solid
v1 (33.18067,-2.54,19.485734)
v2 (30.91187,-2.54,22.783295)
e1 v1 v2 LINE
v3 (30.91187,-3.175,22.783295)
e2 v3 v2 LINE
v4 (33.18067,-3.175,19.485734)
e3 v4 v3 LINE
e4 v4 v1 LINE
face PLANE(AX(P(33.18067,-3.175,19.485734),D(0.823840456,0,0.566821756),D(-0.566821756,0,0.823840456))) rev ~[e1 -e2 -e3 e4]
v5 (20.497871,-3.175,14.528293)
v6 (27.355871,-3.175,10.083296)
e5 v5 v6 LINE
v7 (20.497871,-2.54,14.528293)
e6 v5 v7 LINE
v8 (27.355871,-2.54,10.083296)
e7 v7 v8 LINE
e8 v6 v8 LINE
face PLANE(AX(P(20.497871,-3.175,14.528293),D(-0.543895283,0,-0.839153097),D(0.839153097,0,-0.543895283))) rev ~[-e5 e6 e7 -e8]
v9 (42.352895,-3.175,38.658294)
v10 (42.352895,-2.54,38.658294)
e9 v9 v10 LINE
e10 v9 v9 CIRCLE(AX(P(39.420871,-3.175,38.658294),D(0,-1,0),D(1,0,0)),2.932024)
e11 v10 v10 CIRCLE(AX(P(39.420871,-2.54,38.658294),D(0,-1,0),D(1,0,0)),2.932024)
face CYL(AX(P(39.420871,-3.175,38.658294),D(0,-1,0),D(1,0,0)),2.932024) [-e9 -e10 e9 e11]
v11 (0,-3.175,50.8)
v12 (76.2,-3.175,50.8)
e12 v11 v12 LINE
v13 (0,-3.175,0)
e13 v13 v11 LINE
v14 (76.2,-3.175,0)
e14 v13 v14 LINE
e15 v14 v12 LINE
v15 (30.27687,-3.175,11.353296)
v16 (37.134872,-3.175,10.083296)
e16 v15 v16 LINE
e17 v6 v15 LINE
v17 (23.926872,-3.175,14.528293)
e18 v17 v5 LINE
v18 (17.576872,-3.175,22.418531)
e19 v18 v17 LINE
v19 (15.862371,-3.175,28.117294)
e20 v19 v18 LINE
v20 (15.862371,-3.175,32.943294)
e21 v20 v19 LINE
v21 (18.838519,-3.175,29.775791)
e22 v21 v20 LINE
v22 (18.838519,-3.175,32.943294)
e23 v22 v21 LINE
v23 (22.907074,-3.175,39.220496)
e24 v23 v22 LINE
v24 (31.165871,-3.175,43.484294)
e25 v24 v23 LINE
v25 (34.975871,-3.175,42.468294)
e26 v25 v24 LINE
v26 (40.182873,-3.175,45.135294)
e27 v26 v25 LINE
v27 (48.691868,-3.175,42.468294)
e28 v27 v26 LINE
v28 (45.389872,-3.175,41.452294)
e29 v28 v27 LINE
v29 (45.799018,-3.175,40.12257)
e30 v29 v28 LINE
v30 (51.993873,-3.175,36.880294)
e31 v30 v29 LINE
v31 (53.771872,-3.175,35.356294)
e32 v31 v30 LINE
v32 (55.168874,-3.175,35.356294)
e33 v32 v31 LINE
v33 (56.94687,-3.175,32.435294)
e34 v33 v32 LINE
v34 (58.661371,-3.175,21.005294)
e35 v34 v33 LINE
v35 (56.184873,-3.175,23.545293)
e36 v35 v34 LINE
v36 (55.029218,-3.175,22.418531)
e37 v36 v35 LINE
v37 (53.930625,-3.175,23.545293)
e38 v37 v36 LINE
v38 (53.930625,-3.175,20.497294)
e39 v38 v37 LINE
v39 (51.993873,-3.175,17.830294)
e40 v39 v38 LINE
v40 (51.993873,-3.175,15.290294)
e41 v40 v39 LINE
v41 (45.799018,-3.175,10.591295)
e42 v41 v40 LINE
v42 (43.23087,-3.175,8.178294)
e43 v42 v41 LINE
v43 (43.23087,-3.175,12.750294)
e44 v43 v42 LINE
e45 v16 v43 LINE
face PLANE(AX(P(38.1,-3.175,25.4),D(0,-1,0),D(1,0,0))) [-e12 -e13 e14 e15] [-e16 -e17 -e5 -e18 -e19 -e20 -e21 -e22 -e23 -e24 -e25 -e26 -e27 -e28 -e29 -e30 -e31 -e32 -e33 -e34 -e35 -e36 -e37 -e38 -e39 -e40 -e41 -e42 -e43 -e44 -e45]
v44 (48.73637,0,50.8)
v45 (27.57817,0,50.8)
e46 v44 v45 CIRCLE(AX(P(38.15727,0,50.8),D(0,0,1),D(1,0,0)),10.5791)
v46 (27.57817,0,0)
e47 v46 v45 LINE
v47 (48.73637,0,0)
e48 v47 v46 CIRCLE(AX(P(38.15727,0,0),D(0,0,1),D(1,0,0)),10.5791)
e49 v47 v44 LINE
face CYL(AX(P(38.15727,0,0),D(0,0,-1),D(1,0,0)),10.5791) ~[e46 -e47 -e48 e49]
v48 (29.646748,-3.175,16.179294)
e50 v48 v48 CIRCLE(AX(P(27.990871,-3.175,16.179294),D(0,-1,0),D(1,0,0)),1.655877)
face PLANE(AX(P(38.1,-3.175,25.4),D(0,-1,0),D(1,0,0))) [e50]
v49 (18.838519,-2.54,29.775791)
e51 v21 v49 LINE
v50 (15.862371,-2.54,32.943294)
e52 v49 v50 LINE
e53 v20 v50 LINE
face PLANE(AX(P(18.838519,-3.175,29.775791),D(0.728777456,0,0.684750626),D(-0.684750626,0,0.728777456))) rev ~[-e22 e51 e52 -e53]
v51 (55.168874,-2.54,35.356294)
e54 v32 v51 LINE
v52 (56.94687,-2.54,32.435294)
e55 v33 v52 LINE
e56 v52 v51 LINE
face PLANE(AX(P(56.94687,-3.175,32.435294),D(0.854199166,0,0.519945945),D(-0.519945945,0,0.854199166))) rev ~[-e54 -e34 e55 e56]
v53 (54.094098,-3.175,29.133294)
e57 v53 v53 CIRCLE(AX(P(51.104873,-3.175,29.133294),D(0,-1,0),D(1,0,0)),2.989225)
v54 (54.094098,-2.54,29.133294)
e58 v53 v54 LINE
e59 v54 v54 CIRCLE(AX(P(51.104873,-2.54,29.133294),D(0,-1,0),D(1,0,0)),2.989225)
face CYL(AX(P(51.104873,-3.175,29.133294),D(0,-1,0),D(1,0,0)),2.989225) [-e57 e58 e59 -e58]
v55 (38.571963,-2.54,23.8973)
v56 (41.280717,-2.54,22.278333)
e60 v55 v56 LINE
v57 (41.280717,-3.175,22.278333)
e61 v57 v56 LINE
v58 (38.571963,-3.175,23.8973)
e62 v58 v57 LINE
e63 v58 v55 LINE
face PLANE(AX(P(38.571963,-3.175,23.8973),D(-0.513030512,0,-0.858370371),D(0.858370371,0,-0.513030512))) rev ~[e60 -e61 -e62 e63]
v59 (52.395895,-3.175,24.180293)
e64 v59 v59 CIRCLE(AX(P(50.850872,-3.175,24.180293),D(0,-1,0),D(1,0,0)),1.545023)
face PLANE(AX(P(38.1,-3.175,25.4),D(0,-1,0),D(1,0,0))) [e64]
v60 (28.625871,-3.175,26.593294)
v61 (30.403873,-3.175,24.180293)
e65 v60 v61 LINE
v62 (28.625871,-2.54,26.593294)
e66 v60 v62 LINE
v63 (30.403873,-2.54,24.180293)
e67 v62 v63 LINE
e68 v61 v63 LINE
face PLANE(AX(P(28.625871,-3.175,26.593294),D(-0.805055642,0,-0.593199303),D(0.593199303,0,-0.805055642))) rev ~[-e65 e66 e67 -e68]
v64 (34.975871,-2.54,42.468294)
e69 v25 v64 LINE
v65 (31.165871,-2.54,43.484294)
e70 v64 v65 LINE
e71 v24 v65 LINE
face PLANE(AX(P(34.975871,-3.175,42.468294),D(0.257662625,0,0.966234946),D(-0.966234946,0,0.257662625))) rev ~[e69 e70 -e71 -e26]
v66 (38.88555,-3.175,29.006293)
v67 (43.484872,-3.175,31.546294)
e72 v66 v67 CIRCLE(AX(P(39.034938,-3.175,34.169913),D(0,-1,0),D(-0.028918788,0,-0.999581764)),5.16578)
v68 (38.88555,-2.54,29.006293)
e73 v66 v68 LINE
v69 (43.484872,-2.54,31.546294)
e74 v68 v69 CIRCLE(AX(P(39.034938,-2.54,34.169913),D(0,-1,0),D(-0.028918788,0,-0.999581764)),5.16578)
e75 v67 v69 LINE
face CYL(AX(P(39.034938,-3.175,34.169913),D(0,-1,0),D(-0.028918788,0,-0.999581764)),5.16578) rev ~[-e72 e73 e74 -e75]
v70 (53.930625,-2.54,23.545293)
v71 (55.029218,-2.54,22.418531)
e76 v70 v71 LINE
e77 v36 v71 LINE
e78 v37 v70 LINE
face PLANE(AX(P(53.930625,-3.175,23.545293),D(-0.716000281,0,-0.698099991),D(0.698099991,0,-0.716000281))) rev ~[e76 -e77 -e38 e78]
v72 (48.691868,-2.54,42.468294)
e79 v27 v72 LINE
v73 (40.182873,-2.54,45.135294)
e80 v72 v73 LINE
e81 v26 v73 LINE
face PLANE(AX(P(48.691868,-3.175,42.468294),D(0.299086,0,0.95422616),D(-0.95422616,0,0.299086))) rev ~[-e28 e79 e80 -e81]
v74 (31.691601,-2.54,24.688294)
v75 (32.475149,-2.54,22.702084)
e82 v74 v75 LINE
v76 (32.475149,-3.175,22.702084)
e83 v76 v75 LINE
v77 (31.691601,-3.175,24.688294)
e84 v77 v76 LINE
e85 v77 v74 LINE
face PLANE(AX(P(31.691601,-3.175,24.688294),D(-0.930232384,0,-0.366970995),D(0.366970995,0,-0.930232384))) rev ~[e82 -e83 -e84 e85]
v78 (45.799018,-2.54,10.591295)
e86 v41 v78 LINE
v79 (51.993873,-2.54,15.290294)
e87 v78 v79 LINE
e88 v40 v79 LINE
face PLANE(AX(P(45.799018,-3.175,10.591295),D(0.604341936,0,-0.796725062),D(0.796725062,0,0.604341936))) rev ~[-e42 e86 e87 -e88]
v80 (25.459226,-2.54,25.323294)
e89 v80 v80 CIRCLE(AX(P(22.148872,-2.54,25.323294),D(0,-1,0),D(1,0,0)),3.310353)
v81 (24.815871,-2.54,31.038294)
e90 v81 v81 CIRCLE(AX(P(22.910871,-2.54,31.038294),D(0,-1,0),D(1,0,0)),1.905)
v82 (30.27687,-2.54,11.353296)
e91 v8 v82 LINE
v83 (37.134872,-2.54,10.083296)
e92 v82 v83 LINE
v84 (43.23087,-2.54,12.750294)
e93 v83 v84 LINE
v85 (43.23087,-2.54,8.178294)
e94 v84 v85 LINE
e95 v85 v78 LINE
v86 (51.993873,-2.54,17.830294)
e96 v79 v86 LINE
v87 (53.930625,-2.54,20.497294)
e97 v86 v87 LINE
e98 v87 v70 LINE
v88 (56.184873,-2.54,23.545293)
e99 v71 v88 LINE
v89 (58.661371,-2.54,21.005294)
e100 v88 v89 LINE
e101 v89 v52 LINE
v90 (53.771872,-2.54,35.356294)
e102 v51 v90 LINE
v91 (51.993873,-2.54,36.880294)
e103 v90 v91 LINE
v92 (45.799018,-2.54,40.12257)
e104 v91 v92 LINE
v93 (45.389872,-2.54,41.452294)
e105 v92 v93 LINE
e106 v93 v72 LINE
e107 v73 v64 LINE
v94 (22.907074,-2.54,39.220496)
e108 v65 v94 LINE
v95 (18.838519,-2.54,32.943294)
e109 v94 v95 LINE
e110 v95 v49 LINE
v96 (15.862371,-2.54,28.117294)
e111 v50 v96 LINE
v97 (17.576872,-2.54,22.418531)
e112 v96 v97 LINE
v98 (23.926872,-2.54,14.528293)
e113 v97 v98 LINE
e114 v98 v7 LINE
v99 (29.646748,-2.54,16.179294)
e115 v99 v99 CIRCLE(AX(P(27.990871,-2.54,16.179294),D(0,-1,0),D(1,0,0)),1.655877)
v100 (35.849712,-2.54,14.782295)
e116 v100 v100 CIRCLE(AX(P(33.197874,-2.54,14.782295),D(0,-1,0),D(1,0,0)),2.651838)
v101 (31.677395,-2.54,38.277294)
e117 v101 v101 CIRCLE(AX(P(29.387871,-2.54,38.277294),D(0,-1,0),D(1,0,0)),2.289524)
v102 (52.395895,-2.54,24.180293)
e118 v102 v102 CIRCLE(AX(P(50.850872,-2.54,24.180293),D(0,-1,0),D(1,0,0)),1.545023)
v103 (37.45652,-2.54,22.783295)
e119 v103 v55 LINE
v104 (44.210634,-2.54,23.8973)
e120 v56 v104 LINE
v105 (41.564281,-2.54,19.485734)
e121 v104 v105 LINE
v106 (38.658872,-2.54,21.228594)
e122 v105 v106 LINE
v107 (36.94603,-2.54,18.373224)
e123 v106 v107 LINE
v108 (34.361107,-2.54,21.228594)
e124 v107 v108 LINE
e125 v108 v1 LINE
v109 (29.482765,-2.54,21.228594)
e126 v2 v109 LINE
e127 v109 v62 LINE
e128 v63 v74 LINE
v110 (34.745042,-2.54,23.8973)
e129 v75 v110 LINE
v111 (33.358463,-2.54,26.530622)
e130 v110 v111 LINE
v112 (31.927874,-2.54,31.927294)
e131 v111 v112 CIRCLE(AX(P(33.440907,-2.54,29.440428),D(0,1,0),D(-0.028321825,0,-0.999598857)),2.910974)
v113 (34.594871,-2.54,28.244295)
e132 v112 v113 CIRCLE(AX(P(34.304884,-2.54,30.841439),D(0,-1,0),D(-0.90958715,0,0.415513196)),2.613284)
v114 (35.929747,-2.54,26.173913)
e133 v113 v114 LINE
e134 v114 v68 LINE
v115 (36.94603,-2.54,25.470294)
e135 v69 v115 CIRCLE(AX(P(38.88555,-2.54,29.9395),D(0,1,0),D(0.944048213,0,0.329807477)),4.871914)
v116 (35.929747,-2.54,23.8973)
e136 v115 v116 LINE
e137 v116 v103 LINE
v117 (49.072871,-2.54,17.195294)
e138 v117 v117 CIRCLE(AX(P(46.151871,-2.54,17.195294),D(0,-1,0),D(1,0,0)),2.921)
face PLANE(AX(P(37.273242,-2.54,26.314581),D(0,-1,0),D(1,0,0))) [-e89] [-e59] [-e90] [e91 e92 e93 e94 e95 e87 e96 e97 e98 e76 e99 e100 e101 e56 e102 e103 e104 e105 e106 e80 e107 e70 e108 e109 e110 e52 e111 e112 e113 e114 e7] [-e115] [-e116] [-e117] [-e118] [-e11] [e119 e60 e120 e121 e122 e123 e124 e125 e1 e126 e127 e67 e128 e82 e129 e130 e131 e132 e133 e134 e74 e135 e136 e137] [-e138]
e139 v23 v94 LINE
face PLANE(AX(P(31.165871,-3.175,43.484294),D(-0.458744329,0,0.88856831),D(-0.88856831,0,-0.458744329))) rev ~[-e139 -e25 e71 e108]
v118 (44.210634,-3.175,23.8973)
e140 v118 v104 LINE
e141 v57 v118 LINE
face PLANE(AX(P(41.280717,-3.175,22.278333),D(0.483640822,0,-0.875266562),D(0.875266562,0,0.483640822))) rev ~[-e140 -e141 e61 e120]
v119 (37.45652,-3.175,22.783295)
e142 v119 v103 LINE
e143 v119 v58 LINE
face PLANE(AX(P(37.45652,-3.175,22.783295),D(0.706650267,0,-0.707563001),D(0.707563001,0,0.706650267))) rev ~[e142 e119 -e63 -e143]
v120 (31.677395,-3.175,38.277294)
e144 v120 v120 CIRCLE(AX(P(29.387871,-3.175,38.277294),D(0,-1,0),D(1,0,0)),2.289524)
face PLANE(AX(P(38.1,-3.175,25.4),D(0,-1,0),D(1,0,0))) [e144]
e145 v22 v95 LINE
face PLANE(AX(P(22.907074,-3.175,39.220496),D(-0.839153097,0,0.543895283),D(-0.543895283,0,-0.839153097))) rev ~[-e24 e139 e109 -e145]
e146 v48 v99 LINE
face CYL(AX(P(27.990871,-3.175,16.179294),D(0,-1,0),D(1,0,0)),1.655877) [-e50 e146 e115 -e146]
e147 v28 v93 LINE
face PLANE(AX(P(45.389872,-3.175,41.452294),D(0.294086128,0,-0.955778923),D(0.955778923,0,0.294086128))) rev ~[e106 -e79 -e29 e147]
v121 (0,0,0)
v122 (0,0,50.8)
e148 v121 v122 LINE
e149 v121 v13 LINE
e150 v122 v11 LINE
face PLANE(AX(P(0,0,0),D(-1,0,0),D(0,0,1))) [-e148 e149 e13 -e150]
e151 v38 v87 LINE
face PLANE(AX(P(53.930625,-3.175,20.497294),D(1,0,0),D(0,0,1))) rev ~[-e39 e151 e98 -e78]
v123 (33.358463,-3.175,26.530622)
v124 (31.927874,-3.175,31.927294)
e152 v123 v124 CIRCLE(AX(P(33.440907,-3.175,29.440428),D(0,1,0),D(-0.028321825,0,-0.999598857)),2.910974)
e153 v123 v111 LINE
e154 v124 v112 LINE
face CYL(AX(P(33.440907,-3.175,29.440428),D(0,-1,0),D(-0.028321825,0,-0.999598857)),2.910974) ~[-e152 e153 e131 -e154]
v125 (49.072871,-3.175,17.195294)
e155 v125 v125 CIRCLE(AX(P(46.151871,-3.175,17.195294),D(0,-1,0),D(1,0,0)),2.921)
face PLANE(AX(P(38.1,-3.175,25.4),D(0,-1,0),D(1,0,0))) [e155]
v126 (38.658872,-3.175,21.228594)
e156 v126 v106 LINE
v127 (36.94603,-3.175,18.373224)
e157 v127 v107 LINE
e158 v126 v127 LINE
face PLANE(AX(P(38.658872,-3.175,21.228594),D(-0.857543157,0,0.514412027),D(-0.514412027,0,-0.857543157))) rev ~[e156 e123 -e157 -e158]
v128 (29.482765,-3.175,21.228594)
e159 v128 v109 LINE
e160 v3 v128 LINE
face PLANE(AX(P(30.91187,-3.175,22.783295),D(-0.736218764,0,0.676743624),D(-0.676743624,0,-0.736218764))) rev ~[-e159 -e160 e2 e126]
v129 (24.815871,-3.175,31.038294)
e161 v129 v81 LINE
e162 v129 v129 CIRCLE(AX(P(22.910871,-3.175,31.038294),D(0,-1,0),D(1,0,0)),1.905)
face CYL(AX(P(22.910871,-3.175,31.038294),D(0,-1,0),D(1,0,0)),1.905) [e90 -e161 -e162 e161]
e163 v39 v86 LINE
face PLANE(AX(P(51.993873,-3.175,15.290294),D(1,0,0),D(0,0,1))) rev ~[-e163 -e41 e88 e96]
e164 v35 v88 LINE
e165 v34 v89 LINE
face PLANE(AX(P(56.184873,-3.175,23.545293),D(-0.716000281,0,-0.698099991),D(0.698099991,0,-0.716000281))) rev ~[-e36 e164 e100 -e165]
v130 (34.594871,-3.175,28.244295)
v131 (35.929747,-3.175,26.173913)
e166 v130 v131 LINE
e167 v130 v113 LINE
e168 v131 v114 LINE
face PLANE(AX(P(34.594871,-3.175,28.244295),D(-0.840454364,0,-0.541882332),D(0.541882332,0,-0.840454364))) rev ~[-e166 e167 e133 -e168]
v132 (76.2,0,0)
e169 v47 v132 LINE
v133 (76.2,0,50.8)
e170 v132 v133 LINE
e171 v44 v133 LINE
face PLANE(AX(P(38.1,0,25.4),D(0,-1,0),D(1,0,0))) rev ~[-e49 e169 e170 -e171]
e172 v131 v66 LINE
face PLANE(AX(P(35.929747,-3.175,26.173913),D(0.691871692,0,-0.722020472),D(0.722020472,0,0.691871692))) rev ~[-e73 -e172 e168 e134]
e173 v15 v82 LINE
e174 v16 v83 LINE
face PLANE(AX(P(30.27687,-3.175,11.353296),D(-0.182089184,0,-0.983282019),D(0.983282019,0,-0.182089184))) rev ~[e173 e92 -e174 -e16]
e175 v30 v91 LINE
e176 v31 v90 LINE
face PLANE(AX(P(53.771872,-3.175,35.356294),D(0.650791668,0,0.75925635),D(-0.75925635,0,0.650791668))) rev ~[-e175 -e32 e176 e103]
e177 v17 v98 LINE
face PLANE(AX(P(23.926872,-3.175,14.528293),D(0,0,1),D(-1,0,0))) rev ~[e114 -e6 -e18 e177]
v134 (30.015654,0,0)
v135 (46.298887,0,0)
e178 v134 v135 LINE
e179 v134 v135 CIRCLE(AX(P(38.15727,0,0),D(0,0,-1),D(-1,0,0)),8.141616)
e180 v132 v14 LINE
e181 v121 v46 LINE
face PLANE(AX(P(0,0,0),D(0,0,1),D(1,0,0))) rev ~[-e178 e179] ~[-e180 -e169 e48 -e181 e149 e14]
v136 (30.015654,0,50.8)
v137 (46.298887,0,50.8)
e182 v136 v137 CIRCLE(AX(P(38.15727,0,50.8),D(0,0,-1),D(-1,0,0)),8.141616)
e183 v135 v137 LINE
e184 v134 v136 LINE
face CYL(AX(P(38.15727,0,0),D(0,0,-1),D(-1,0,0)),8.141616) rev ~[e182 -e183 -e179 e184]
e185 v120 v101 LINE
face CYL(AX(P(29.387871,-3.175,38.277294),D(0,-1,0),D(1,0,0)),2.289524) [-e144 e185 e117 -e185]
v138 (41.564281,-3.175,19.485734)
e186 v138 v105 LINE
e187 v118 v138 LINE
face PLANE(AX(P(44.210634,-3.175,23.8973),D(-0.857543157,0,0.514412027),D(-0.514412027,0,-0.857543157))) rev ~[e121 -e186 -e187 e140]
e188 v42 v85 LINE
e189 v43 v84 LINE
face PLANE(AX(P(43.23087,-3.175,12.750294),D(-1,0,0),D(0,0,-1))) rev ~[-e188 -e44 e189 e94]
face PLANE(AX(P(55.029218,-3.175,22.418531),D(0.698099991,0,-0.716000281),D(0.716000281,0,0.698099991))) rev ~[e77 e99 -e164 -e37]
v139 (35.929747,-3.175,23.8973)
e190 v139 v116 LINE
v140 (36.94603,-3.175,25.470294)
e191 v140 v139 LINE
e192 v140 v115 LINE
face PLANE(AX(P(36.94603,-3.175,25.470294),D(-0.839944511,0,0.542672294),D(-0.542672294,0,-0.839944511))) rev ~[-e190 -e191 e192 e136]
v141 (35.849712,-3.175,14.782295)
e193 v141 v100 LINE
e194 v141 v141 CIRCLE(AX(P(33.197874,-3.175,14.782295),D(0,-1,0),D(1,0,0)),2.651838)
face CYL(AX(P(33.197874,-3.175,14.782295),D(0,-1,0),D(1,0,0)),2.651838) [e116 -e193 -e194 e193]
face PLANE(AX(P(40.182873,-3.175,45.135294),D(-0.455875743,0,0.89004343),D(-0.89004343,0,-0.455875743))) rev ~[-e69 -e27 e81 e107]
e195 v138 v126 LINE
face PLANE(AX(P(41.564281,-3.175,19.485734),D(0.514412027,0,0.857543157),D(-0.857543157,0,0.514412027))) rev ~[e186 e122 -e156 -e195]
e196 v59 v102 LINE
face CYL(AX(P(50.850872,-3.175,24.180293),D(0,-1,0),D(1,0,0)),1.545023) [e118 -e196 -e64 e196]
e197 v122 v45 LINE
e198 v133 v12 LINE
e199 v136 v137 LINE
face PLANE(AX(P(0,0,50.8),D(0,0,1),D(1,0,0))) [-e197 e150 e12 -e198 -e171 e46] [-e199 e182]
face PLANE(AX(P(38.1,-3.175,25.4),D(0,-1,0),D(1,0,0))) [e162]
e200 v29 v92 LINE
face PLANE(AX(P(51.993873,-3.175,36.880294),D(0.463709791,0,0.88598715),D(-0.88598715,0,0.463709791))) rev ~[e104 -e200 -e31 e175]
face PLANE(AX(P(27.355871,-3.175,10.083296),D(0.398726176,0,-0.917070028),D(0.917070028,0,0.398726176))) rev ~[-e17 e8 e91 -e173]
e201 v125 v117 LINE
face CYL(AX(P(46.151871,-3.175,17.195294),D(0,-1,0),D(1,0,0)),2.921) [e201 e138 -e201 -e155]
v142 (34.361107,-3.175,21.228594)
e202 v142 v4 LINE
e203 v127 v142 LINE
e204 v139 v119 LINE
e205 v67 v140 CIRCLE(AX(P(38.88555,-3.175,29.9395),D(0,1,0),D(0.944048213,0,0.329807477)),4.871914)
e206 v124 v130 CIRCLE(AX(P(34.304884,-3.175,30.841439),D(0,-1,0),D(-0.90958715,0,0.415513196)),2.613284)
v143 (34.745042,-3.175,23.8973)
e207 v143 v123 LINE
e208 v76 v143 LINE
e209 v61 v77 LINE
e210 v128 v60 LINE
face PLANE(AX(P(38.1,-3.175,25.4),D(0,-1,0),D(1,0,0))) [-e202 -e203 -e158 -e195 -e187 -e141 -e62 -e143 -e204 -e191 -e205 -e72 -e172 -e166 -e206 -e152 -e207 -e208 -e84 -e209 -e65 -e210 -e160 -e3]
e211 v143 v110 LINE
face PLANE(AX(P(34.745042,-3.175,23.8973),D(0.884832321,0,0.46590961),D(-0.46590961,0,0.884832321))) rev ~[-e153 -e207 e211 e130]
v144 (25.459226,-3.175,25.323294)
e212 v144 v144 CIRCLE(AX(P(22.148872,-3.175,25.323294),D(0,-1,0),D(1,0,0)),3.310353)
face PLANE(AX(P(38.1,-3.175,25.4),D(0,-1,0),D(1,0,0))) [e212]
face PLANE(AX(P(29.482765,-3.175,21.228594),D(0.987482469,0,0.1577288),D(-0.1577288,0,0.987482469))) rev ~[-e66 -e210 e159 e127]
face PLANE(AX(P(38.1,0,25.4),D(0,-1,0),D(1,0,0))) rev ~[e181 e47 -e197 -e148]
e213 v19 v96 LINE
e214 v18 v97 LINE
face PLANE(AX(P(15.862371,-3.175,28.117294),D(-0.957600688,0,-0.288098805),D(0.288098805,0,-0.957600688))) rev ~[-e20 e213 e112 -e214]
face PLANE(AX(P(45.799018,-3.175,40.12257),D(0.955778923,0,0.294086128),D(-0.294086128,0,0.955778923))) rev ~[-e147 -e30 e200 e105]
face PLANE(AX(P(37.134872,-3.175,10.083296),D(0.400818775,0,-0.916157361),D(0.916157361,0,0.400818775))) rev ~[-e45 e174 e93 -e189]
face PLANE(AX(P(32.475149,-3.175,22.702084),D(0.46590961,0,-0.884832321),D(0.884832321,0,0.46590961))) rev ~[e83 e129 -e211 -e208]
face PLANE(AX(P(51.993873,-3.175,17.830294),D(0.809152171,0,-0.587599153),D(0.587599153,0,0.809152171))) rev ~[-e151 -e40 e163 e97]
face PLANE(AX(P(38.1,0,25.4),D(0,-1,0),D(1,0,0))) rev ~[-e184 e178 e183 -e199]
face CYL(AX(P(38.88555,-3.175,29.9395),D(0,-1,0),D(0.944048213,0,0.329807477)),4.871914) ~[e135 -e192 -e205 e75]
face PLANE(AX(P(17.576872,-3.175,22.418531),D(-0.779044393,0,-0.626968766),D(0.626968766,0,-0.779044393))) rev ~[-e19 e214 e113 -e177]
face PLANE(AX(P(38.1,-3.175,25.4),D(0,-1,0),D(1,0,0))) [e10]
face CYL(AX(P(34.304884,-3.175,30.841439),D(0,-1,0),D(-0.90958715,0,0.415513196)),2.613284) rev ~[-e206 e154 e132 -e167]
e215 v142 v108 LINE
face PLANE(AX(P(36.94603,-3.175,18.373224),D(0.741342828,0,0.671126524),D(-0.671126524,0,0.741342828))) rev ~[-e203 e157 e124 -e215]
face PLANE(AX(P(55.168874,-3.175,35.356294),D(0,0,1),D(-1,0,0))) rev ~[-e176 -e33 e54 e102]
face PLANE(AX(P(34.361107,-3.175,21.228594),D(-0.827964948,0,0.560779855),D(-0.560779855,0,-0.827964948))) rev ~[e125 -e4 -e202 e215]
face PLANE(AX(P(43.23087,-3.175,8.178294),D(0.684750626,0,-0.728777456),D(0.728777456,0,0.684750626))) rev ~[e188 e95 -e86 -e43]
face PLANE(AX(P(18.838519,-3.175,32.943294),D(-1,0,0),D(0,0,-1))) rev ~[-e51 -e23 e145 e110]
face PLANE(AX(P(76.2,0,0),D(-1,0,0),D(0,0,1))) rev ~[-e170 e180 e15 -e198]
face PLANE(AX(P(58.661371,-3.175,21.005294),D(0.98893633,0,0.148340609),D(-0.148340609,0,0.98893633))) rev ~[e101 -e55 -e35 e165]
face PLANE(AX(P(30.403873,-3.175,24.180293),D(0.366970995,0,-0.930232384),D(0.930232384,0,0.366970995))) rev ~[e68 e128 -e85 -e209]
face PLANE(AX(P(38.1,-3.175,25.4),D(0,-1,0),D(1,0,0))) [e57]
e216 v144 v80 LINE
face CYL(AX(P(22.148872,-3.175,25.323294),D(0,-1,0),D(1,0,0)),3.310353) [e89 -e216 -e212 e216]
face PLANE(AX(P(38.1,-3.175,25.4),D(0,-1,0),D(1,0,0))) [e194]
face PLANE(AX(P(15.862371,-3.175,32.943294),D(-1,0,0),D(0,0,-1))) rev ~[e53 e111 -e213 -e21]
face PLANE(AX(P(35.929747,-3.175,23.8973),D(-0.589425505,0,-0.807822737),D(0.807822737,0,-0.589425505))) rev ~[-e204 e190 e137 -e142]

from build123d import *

# Parameters (mm, degrees)
F0_W     = 76.2
F0_H     = 50.8
F1_DEPTH = 3.175
F2_R     = 1.6558767695
F2_R_2   = 2.6518381977
F2_R_3   = 3.3103533059
F2_R_4   = 2.921000123
F2_R_5   = 1.5450229593
F2_R_6   = 1.9050003029
F2_R_7   = 2.2895237278
F2_R_8   = 2.9892250919
F2_R_9   = 2.9320238784
F3_DEPTH = 0.635
F5_DEPTH = 50.8


# Not quite as in the source:
# - a feature names something its author has since deleted; it is built from what else it names


with BuildPart() as f1:
    # F0 (on Front) → F1 (new body)
    with BuildSketch(Plane.XZ):
        with Locations((38.1, 25.4)):
            Rectangle(F0_W, F0_H)
    extrude(amount=F1_DEPTH)

    # F2 (on face) → F3 (cut)
    with BuildSketch(Plane.XZ.offset(3.175)):
        Polygon((48.691868487, 42.4682941364), (40.1828733117, 45.1352943044), (34.9758711487, 42.4682941364), (31.1658705429, 43.4842941893), (22.9070743114, 39.2204960176), (18.8385191247, 32.9432937858), (18.8385191247, 29.7757912988), (15.8623714775, 32.9432937858), (15.8623714775, 28.1172938255), (17.5768719597, 22.418530716), (23.9268724651, 14.5282934961), (20.4978712678, 14.5282934961), (27.3558708683, 10.0832957385), (30.27687006, 11.35329563), (37.1348724544, 10.0832957385), (43.2308704436, 12.7502943931), (43.2308704436, 8.1782940386), (45.7990180271, 10.59129495), (51.9938726753, 15.2902941761), (51.9938726753, 17.8302939592), (53.930624873, 20.4972944764), (53.930624873, 23.545293471), (55.0292181151, 22.418530716), (56.1848726899, 23.545293471), (58.6613714775, 21.005293688), (56.9468696446, 32.435293643), (55.1688742668, 35.356293766), (53.7718717784, 35.356293766), (51.9938726753, 36.8802941946), (45.7990180271, 40.1225700636), (45.3898717493, 41.4522940835), align=None)
        with Locations((27.9908708141, 16.1792937277)):
            Circle(F2_R, mode=Mode.SUBTRACT)
        with Locations((33.1978739083, 14.7822949646)):
            Circle(F2_R_2, mode=Mode.SUBTRACT)
        with Locations((22.1488724307, 25.3232944367)):
            Circle(F2_R_3, mode=Mode.SUBTRACT)
        with BuildLine():
            Line((29.4827647798, 21.2285935147), (28.6258707598, 26.5932943282))
            Line((28.6258707598, 26.5932943282), (30.4038726569, 24.1802934168))
            Line((30.4038726569, 24.1802934168), (31.6916008863, 24.6882943394))
            Line((31.6916008863, 24.6882943394), (32.4751487195, 22.7020840415))
            Line((32.4751487195, 22.7020840415), (34.7450423849, 23.8972995039))
            Line((34.7450423849, 23.8972995039), (33.3584630646, 26.5306218754))
            ThreePointArc((33.3584630646, 26.5306218754), (30.6271191315, 28.6945286164), (31.9278740168, 31.9272935001))
            ThreePointArc((31.9278740168, 31.9272935001), (32.188274126, 29.3087235679), (34.5948708088, 28.2442945597))
            Line((34.5948708088, 28.2442945597), (35.9297474949, 26.173913466))
            Line((35.9297474949, 26.173913466), (38.8855502865, 29.0062933771))
            ThreePointArc((38.8855502865, 29.0062933771), (41.5322516722, 29.6478879221), (43.484871912, 31.5462940914))
            ThreePointArc((43.484871912, 31.5462940914), (42.2018854798, 26.3705417725), (36.9460296513, 25.4702941614))
            Line((36.9460296513, 25.4702941614), (35.9297474949, 23.8972995039))
            Line((35.9297474949, 23.8972995039), (37.4565196476, 22.7832946537))
            Line((37.4565196476, 22.7832946537), (38.571963384, 23.8972995039))
            Line((38.571963384, 23.8972995039), (41.2807169848, 22.2783325716))
            Line((41.2807169848, 22.2783325716), (44.2106343052, 23.8972995039))
            Line((44.2106343052, 23.8972995039), (41.5642807871, 19.4857340033))
            Line((41.5642807871, 19.4857340033), (38.6588719517, 21.2285935147))
            Line((38.6588719517, 21.2285935147), (36.9460296513, 18.3732244384))
            Line((36.9460296513, 18.3732244384), (34.3611069299, 21.2285935147))
            Line((34.3611069299, 21.2285935147), (33.1806698754, 19.4857340033))
            Line((33.1806698754, 19.4857340033), (30.9118700058, 22.7832946537))
            Line((30.9118700058, 22.7832946537), (29.4827647798, 21.2285935147))
        make_face(mode=Mode.SUBTRACT)
        with Locations((46.1518705666, 17.1952940134)):
            Circle(F2_R_4, mode=Mode.SUBTRACT)
        with Locations((50.8508716554, 24.1802934168)):
            Circle(F2_R_5, mode=Mode.SUBTRACT)
        with Locations((22.9108707823, 31.0382939485)):
            Circle(F2_R_6, mode=Mode.SUBTRACT)
        with Locations((29.3878714398, 38.277293889)):
            Circle(F2_R_7, mode=Mode.SUBTRACT)
        with Locations((51.1048731238, 29.1332941113)):
            Circle(F2_R_8, mode=Mode.SUBTRACT)
        with Locations((39.4208707691, 38.658294229)):
            Circle(F2_R_9, mode=Mode.SUBTRACT)
    extrude(amount=-F3_DEPTH, mode=Mode.SUBTRACT)

    # F4 (on Top) → F5 (join)
    with BuildSketch(Plane.XY):
        with BuildLine():
            ThreePointArc((30.0156539358, 0), (38.1572704301, 8.1416164943), (46.2988869244, 0))
            Line((46.2988869244, 0), (48.7363704301, 0))
            ThreePointArc((48.7363704301, 0), (38.1572704301, 10.5791), (27.5781704301, 0))
            Line((27.5781704301, 0), (30.0156539358, 0))
        make_face()
    extrude(amount=F5_DEPTH)


solid = f1.part
